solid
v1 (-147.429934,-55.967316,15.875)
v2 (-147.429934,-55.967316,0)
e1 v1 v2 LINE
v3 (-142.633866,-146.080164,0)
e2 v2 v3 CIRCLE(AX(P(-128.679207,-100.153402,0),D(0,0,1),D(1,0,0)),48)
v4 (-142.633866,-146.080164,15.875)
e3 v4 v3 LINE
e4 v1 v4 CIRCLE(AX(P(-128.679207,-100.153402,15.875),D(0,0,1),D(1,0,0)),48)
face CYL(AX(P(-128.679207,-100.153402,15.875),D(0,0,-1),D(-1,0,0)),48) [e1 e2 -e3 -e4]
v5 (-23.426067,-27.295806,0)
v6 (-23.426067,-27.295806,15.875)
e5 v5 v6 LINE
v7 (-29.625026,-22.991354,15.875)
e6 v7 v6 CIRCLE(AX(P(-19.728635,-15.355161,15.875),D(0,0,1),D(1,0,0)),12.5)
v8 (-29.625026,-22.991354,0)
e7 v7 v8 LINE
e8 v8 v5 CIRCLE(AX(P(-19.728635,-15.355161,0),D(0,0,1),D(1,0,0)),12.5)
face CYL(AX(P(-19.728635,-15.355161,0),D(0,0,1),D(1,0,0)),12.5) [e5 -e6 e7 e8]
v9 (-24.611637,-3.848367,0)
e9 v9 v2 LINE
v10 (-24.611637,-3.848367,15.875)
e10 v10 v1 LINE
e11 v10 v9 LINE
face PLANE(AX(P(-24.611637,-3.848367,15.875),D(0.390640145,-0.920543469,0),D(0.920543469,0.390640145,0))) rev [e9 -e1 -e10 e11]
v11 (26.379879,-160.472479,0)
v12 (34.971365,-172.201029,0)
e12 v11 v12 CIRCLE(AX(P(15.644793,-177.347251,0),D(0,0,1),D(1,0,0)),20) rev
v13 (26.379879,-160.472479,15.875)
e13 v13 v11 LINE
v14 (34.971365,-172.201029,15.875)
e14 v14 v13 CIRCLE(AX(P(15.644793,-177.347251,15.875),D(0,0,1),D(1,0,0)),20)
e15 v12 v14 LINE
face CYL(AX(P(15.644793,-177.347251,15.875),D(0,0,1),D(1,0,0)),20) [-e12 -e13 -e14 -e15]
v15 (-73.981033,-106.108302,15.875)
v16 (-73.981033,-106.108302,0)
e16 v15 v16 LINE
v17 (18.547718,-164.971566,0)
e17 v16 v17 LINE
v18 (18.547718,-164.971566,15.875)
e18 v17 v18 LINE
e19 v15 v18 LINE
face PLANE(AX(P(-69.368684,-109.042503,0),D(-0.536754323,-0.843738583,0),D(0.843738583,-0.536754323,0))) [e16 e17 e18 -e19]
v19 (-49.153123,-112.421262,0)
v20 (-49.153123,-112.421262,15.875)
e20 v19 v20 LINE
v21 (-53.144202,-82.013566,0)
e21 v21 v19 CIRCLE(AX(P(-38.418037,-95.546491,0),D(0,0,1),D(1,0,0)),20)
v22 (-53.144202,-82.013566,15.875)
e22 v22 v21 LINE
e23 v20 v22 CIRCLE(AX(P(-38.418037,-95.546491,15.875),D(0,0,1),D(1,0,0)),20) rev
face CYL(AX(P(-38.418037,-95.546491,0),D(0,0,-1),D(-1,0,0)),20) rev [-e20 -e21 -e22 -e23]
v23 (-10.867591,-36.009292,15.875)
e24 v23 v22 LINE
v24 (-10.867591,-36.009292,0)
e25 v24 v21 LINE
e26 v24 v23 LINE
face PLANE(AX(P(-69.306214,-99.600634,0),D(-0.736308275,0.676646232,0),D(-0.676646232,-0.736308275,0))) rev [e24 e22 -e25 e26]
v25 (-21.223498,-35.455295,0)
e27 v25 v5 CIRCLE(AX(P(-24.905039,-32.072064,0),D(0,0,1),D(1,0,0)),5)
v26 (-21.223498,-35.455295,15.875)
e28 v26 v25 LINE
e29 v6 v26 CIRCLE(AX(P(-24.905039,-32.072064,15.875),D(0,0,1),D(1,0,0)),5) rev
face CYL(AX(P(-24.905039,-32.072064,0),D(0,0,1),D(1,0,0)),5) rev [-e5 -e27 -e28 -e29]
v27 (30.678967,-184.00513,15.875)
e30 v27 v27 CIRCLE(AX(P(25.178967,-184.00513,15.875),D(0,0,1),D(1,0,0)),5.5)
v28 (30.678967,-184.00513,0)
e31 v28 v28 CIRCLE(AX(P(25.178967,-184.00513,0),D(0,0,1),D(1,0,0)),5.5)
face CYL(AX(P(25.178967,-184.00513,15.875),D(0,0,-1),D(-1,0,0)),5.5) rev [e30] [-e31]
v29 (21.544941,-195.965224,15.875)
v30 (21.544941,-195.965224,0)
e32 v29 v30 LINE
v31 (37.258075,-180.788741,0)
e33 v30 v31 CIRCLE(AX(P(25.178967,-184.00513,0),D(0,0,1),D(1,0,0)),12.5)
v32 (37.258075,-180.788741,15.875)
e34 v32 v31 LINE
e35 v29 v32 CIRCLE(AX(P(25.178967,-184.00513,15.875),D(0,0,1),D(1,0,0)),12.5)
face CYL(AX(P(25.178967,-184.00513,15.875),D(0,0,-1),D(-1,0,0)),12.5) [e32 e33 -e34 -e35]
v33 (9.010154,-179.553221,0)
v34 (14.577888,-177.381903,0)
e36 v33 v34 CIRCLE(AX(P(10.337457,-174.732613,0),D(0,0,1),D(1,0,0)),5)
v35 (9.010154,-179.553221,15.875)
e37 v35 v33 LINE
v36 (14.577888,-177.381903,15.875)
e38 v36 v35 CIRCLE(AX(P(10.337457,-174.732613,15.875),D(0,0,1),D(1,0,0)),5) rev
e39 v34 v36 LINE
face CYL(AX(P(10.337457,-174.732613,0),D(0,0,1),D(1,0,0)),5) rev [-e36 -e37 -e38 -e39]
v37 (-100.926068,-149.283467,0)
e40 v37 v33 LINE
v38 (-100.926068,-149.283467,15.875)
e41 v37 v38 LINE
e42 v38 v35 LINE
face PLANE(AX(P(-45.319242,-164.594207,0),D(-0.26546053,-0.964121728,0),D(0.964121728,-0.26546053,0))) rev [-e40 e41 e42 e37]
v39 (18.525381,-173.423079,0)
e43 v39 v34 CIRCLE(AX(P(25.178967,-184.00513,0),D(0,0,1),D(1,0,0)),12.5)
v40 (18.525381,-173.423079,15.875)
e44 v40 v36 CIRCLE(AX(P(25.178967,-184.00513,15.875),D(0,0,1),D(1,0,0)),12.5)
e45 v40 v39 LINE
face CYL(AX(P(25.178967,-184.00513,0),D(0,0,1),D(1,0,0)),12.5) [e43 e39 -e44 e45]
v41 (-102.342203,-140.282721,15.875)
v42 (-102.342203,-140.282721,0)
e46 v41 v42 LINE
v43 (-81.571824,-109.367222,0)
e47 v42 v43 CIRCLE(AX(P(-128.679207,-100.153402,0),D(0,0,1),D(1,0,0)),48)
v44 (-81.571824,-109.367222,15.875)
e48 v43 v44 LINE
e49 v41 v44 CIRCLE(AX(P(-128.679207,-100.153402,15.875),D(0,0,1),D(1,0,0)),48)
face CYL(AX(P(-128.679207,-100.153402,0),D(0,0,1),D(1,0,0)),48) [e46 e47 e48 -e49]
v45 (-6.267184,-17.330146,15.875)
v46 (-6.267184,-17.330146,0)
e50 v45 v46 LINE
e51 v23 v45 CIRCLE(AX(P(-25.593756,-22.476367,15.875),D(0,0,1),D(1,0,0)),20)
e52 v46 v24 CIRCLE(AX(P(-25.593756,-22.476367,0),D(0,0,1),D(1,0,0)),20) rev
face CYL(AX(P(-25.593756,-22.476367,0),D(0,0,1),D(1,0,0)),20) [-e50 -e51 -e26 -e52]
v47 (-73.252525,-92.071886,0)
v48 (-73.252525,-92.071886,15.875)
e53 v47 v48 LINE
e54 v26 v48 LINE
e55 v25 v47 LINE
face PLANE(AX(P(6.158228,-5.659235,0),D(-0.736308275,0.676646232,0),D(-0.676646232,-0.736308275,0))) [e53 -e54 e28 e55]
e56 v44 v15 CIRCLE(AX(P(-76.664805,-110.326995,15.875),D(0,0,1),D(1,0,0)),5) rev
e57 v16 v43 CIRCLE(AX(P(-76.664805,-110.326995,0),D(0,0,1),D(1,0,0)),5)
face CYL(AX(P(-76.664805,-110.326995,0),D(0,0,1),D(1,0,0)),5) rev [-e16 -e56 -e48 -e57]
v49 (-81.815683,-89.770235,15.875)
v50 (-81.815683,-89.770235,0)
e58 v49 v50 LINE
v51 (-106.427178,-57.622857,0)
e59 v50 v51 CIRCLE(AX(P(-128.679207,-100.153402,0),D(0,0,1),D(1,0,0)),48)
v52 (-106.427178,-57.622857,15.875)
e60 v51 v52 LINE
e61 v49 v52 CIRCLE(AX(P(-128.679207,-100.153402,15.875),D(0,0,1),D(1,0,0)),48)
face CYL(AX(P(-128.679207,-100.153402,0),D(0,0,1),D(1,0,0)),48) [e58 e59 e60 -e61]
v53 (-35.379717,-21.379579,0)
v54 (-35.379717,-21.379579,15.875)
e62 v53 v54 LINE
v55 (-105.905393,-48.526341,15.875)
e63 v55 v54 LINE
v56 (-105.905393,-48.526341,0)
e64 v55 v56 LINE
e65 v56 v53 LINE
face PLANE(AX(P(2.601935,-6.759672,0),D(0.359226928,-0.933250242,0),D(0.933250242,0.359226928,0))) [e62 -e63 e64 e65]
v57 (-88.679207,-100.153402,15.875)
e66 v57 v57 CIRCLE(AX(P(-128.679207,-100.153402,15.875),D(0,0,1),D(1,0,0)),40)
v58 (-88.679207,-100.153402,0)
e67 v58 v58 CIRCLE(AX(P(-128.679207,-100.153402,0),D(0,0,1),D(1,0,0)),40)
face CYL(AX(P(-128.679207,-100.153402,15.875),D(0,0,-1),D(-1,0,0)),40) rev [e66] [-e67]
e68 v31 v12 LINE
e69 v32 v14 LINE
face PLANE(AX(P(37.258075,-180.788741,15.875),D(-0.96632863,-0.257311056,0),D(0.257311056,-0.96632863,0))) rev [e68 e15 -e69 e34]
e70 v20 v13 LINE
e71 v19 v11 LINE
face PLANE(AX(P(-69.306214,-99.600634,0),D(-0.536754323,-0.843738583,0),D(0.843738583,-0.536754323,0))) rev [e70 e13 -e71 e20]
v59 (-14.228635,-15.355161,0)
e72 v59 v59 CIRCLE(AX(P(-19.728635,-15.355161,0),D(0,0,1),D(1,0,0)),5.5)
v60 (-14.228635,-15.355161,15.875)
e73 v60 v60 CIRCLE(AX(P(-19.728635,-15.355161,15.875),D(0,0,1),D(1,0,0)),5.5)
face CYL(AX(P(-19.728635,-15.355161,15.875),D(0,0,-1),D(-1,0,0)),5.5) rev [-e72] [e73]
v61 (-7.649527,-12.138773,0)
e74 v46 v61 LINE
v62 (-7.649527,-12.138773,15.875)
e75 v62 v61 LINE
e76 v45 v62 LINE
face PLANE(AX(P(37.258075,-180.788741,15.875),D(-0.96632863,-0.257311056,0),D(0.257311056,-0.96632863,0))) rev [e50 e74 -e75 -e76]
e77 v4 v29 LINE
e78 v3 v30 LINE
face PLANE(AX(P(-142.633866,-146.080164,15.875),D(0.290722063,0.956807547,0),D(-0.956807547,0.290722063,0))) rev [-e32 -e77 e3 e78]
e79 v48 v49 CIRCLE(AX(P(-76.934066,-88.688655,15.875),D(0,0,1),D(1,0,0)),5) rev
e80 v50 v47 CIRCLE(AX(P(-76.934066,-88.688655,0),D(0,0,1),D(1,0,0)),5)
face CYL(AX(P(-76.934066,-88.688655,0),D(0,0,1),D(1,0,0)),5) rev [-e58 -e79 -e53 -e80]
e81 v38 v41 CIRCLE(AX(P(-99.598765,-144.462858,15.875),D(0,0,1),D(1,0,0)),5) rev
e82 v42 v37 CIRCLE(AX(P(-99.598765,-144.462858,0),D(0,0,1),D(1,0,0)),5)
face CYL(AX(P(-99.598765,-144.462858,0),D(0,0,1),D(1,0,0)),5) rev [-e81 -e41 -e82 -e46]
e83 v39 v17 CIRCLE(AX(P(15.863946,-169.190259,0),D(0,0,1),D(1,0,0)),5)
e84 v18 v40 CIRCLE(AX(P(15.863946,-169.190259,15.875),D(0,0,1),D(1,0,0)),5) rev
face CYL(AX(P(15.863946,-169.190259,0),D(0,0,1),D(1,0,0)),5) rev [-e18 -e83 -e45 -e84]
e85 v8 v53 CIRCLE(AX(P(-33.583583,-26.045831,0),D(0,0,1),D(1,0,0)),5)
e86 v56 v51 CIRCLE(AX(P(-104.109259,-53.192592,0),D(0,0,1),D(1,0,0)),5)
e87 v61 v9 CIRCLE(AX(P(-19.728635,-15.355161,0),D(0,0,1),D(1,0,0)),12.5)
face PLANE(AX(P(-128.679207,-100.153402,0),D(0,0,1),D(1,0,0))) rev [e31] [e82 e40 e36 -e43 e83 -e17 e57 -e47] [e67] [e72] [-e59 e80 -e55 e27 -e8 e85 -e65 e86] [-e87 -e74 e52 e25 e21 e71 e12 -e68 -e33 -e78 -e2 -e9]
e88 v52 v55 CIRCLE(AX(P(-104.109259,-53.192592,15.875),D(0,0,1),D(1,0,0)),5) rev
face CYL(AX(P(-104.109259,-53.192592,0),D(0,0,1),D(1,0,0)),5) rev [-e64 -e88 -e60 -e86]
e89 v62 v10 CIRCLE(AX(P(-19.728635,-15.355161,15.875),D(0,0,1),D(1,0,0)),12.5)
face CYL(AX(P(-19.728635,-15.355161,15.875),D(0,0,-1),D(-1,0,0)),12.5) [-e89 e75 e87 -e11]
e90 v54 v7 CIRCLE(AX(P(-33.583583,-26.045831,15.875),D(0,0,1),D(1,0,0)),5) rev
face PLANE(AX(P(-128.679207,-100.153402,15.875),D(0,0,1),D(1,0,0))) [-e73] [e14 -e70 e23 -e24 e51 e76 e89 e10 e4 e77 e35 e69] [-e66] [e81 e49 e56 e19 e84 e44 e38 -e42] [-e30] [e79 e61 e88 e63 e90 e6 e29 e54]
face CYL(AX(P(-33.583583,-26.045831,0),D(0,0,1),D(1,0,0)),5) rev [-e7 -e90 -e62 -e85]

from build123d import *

# Parameters (mm, degrees)
SKETCH4_R           = 40
SKETCH4_R_2         = 5.5
BOSS_EXTRUDE1_DEPTH = 15.875
CUT_EXTRUDE2_DEPTH  = 265.729718277
FILLET1_R           = 5
CUT_EXTRUDE3_DEPTH  = 265.729718424
FILLET2_R           = 20


with BuildPart() as part:
    # Sketch4 → Boss-Extrude1 (new body)
    with BuildSketch(Plane.XY):
        with BuildLine():
            Line((-142.633865887, -146.080164327), (21.544941406, -195.965223983))
            ThreePointArc((21.544941406, -195.965223983), (33.862932788, -192.99616638), (37.258075063, -180.78874144))
            Line((37.258075063, -180.78874144), (-7.649527095, -12.138772571))
            ThreePointArc((-7.649527095, -12.138772571), (-14.239674224, -4.124786339), (-24.611636772, -3.848367419))
            Line((-24.611636772, -3.848367419), (-147.429933804, -55.967315581))
            ThreePointArc((-147.429933804, -55.967315581), (-176.611366682, -102.704491033), (-142.633865887, -146.080164327))
        make_face()
        with Locations((-128.679206861, -100.153402069)):
            Circle(SKETCH4_R, mode=Mode.SUBTRACT)
        with Locations((25.178967194, -184.005129645)):
            Circle(SKETCH4_R_2, mode=Mode.SUBTRACT)
        with Locations((-19.728634964, -15.355160776)):
            Circle(SKETCH4_R_2, mode=Mode.SUBTRACT)
    extrude(amount=BOSS_EXTRUDE1_DEPTH)

    # Sketch5 → Cut-Extrude2 (cut, through all)
    with BuildSketch(Plane.XY.offset(15.875)):
        with BuildLine():
            Line((-31.394262991, -19.845497372), (-118.286356862, -53.292024914))
            ThreePointArc((-118.286356862, -53.292024914), (-91.243550062, -70.110572642), (-80.679206861, -100.153402069))
            Line((-80.679206861, -100.153402069), (-10.524781522, -23.813238679))
            ThreePointArc((-10.524781522, -23.813238679), (-22.063335437, -27.635192278), (-31.394262991, -19.845497372))
        make_face()
        with BuildLine():
            ThreePointArc((-80.708447165, -101.828577911), (-90.303653302, -128.985968536), (-113.716587883, -145.761735006))
            Line((-113.716587883, -145.761735006), (13.127445592, -180.686873014))
            ThreePointArc((13.127445592, -180.686873014), (20.684837316, -172.340962438), (31.888396226, -173.458397351))
            Line((31.888396226, -173.458397351), (-80.708447165, -101.828577911))
        make_face()
    extrude(amount=-CUT_EXTRUDE2_DEPTH, mode=Mode.SUBTRACT)

    # Fillet1
    fillet1_edges = [part.edges().sort_by_distance(p)[0] for p in [
        (-31.394262991, -19.845497372, 7.9375),
        (-10.524781522, -23.813238679, 7.9375),
        (-80.679206861, -100.153402069, 7.9375),
        (-118.286356862, -53.292024914, 7.9375),
        (13.127445592, -180.686873014, 7.9375),
        (-113.716587883, -145.761735006, 7.9375),
        (-80.708447165, -101.828577911, 7.9375),
    ]]
    fillet(fillet1_edges, radius=FILLET1_R)
    fillet1_2_edges = [part.edges().sort_by_distance(p)[0] for p in [
        (31.888396226, -173.458397351, 7.9375),
    ]]
    fillet(fillet1_2_edges, radius=FILLET1_R)

    # Sketch6 → Cut-Extrude3 (cut, through all)
    with BuildSketch(Plane.XY.offset(15.875)):
        Polygon((-69.306214403, -99.600633953), (-3.444297399, -27.931462965), (32.963567977, -164.660770859), align=None)
    extrude(amount=-CUT_EXTRUDE3_DEPTH, mode=Mode.SUBTRACT)

    # Fillet2
    fillet2_edges = [part.edges().sort_by_distance(p)[0] for p in [
        (32.963567977, -164.660770859, 7.9375),
        (-69.306214403, -99.600633953, 7.9375),
        (-3.444297399, -27.931462965, 7.9375),
    ]]
    fillet(fillet2_edges, radius=FILLET2_R)


solid = part.part
